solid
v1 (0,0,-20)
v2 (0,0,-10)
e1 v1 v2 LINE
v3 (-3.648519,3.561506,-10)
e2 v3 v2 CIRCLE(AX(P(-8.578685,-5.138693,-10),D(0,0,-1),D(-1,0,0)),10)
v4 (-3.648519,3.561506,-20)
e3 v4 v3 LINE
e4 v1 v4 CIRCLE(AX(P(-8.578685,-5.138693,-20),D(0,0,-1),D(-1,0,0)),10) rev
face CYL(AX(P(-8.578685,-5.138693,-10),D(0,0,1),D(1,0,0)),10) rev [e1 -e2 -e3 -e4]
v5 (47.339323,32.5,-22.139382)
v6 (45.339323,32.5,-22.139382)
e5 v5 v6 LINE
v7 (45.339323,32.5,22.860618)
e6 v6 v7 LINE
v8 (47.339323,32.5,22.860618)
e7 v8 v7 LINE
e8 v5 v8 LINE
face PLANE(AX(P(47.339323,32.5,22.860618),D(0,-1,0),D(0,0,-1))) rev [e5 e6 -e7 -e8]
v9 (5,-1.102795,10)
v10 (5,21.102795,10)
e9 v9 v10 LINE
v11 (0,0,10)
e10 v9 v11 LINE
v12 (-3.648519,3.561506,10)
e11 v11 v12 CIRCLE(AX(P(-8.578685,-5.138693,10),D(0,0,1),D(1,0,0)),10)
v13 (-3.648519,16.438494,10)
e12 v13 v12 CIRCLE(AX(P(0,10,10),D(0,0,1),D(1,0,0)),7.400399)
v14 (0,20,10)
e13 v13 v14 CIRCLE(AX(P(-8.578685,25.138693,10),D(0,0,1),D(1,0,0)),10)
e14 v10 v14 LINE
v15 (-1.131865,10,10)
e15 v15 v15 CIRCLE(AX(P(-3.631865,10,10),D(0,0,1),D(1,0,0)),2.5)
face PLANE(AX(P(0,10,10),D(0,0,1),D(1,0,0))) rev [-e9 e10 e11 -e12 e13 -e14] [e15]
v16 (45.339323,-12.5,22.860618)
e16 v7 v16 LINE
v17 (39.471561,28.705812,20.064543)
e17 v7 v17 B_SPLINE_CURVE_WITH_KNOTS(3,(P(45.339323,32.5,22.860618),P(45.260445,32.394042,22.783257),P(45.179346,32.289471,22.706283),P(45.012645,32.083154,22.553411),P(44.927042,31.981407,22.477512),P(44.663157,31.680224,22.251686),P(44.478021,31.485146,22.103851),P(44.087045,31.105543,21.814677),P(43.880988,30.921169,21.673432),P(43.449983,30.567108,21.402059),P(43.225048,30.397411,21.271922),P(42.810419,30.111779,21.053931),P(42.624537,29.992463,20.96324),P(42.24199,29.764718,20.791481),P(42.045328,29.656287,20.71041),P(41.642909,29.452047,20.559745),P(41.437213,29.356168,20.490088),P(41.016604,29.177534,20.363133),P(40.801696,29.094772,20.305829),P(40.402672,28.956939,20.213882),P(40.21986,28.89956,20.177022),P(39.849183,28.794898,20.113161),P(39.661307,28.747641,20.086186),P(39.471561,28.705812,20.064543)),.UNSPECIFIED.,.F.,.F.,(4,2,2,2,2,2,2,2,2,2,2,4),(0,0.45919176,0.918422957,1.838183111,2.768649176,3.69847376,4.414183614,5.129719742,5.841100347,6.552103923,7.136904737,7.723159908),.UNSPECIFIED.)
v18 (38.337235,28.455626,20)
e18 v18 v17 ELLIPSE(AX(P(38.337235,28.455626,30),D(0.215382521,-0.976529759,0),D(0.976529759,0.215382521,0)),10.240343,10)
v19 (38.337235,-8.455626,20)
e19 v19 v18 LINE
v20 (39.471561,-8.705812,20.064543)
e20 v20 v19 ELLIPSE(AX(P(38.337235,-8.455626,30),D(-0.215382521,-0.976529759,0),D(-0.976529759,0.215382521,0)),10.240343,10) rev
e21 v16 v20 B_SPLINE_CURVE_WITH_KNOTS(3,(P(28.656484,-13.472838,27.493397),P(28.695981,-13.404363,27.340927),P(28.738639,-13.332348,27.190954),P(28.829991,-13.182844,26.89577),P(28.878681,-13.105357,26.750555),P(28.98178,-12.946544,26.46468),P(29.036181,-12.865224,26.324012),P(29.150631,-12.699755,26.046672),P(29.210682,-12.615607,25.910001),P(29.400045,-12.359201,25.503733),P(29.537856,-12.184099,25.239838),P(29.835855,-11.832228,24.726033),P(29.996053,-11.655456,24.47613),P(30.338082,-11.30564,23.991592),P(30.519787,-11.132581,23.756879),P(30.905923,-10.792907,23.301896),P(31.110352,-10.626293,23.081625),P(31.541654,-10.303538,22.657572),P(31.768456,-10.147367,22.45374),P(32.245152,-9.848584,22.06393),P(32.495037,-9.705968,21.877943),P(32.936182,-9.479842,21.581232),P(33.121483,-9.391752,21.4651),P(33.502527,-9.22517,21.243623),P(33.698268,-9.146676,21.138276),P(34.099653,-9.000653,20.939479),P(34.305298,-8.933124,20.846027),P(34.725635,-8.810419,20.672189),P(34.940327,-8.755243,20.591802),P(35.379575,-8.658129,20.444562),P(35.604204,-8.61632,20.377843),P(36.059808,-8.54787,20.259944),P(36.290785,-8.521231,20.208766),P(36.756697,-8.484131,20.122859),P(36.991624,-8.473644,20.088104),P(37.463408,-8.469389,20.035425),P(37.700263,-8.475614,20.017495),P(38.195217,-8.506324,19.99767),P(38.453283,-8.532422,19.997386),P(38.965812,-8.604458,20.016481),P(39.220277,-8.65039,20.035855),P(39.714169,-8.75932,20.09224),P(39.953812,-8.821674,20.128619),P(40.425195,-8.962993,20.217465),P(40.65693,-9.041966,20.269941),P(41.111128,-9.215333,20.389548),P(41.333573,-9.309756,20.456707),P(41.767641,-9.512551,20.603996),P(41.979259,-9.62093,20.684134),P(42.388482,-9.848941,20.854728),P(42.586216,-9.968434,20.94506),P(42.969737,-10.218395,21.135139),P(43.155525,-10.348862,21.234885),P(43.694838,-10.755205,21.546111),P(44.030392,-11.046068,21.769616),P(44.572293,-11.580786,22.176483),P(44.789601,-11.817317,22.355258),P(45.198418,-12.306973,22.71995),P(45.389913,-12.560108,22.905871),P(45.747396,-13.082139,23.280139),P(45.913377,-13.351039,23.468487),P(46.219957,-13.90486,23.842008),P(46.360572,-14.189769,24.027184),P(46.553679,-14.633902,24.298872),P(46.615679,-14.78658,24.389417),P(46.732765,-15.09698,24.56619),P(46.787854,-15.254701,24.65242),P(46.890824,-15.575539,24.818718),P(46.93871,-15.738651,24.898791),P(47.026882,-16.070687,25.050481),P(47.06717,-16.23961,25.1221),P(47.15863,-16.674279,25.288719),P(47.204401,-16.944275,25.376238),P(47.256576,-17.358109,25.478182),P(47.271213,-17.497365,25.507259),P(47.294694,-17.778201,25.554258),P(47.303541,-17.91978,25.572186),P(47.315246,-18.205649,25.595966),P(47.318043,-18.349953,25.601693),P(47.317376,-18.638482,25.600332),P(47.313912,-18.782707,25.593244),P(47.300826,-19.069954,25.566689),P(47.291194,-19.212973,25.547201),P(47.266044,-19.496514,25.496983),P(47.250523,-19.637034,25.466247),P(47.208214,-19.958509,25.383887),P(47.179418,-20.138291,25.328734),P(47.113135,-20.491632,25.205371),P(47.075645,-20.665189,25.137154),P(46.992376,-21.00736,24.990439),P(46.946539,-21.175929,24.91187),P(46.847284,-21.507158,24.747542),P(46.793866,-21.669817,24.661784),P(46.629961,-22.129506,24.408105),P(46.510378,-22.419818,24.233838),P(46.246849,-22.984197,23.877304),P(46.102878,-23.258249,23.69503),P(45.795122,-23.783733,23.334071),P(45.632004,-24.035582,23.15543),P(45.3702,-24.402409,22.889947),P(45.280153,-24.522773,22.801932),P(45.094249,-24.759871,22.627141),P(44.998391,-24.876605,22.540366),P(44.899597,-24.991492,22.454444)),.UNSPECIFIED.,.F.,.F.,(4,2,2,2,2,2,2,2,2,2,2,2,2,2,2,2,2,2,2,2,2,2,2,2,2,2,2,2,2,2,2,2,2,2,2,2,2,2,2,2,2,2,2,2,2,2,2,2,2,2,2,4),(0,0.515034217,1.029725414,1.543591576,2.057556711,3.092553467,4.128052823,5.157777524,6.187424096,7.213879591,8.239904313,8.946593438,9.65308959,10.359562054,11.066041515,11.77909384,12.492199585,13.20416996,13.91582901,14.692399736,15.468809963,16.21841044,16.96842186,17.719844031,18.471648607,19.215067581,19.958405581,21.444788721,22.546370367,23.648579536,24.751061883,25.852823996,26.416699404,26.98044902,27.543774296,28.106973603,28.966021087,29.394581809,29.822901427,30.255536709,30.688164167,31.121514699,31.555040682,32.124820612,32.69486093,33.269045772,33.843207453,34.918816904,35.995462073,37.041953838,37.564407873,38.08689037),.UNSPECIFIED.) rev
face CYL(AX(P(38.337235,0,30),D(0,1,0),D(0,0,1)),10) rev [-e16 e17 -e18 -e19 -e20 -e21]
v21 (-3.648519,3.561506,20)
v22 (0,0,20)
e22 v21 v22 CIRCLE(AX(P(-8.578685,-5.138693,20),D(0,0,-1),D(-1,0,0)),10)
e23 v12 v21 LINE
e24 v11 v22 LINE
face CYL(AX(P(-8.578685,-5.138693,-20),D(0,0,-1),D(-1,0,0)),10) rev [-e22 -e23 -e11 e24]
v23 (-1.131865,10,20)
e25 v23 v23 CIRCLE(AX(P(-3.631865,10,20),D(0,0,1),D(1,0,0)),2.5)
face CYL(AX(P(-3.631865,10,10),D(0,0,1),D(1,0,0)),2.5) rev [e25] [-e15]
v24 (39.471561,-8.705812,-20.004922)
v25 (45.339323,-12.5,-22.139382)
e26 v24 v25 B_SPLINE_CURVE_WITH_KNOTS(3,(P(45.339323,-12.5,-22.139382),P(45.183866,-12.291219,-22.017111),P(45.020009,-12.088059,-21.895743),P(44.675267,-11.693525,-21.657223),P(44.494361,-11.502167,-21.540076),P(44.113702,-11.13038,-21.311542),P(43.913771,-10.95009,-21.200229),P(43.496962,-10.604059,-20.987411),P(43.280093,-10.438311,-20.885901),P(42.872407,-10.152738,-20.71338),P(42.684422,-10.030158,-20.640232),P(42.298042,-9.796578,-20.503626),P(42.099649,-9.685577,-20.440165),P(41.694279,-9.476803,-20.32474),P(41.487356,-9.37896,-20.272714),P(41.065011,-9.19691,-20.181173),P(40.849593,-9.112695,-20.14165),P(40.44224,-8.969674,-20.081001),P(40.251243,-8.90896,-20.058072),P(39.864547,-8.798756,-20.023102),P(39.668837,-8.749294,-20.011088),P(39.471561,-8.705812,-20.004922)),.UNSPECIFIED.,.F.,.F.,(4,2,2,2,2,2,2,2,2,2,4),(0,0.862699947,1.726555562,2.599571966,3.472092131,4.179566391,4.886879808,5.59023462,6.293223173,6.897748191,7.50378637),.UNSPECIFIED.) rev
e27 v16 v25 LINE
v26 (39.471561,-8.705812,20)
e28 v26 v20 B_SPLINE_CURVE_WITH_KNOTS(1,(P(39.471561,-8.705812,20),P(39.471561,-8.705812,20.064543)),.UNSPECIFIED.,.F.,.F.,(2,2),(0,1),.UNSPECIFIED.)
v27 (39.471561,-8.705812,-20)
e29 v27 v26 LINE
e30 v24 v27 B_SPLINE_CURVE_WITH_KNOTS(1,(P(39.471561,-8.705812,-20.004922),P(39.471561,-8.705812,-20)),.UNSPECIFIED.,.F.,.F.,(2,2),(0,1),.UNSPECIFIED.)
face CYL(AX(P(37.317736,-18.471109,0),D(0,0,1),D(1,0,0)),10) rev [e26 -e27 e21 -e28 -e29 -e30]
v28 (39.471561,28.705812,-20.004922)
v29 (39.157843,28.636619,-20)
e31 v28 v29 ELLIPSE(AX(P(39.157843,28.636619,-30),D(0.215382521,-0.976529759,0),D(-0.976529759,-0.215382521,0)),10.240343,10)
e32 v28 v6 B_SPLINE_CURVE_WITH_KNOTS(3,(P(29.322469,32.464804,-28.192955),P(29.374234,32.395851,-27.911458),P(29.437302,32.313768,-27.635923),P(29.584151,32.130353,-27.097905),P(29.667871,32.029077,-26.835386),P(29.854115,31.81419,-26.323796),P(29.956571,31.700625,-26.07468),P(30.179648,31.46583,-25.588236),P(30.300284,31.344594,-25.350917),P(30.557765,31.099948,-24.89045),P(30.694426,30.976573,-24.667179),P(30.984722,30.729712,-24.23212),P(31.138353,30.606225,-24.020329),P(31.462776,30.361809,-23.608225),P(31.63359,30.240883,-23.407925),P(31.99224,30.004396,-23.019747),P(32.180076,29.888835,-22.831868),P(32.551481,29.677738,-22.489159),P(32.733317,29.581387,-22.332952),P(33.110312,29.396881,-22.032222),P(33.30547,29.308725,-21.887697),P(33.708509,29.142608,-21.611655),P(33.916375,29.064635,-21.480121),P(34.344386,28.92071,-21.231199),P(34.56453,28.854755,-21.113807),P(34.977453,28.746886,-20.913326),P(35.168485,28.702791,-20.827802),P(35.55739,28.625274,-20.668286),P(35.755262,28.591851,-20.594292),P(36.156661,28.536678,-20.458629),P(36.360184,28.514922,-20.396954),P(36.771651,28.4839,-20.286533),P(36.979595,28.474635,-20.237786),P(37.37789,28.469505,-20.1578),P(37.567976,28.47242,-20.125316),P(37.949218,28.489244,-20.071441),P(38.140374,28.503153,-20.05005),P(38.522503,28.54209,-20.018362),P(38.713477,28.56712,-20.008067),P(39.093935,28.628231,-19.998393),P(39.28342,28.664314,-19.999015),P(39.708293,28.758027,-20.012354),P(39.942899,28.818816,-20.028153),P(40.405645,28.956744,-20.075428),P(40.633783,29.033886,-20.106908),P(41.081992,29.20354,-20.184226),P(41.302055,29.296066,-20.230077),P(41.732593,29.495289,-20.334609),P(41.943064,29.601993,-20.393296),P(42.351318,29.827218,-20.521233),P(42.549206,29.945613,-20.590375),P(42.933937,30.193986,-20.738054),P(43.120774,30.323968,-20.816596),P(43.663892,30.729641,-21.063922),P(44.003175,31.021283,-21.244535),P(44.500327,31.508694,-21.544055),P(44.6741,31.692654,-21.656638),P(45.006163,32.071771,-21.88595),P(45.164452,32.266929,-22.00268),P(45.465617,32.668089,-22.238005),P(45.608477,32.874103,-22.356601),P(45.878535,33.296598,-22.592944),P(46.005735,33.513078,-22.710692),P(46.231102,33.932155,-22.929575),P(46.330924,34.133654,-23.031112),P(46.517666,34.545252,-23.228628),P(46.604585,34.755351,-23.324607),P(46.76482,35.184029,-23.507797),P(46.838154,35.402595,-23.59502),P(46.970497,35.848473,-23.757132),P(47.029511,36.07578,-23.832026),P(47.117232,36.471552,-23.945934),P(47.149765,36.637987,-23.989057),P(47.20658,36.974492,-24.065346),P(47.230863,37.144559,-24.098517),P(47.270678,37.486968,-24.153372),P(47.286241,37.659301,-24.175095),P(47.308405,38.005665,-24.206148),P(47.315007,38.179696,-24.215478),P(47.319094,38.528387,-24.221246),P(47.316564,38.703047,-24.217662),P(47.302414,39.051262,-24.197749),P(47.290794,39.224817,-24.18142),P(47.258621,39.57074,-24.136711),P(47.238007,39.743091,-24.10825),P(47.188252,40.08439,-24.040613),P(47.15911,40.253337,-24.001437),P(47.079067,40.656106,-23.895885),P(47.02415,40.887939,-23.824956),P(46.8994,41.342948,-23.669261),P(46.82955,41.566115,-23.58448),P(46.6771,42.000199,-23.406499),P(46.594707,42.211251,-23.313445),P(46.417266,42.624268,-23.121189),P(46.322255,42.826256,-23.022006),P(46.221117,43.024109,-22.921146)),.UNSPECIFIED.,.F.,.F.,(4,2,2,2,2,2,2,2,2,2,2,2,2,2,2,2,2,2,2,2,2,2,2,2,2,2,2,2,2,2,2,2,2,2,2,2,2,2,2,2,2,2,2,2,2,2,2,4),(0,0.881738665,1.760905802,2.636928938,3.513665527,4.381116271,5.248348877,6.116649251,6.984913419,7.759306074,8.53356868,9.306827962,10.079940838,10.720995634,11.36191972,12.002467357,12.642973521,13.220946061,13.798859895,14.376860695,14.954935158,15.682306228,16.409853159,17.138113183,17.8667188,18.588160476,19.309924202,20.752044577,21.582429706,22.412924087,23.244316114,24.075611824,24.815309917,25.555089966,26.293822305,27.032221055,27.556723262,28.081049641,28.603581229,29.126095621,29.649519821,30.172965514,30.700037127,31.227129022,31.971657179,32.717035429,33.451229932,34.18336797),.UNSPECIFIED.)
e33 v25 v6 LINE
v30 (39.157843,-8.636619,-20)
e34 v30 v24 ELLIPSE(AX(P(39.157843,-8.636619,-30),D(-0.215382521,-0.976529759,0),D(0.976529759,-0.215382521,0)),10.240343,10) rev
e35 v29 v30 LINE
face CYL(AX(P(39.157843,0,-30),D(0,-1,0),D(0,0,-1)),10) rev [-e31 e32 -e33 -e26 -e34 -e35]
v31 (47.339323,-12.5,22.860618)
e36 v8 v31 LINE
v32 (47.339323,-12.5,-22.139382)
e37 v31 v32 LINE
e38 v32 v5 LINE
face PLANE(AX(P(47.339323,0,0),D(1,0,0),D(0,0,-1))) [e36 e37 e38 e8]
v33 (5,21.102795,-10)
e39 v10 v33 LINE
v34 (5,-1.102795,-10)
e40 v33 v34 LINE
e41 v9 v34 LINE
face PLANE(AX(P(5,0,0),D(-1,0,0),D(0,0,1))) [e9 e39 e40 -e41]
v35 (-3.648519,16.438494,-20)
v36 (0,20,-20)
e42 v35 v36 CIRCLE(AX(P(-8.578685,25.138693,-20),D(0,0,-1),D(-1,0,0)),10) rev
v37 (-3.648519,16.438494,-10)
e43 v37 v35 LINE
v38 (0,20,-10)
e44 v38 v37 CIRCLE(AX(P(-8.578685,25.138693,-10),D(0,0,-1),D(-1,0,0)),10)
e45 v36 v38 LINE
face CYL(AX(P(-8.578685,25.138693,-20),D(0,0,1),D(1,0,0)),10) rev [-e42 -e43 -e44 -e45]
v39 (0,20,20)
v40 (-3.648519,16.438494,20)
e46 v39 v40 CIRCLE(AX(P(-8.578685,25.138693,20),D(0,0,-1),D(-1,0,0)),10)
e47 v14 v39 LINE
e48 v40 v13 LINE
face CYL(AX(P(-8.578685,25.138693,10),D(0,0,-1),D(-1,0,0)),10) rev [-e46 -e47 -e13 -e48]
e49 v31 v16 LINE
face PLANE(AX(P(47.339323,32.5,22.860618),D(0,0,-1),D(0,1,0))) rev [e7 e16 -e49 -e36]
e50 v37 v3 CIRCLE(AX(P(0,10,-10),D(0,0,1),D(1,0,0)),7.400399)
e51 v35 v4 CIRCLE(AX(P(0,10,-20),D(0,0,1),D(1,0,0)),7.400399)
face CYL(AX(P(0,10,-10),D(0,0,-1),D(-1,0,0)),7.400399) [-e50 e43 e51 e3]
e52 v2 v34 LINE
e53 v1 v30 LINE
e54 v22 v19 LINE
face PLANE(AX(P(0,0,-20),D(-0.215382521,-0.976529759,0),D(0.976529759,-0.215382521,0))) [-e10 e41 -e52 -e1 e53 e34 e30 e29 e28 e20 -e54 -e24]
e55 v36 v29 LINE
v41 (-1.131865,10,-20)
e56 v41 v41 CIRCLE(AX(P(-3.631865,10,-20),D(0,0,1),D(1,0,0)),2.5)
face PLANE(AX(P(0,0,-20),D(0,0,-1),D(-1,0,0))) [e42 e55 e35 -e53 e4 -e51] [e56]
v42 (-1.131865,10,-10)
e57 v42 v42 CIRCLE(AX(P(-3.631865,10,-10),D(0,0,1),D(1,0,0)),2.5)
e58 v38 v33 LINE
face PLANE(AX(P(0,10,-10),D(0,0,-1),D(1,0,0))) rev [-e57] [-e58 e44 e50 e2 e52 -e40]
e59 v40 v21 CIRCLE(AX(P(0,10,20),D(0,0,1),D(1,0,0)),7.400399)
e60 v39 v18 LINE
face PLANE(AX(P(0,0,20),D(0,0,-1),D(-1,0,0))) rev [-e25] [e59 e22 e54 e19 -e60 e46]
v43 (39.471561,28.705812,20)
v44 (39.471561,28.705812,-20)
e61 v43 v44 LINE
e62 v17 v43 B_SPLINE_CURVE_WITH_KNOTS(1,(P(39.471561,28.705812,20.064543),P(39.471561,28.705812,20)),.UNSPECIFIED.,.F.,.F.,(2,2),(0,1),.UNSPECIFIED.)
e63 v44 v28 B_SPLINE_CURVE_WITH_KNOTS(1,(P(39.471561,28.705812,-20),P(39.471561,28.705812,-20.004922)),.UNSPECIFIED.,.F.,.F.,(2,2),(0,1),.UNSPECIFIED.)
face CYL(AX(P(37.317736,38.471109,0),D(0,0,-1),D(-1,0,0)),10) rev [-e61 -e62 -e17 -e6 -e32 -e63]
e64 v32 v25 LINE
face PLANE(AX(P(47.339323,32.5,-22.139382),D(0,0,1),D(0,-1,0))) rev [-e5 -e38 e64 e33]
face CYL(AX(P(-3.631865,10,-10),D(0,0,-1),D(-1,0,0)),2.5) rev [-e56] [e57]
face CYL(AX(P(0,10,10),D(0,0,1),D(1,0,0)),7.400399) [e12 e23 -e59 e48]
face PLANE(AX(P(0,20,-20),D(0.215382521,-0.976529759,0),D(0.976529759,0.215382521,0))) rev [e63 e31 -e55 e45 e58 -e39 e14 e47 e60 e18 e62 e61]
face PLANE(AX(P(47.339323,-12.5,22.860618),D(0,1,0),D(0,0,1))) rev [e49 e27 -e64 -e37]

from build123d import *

# Parameters (mm, degrees)
BOSS_EXTRUDE1_DEPTH      = 20
BOSS_EXTRUDE1_DEPTH_BACK = 20
SKETCH2_W                = 45
SKETCH2_H                = 45
BOSS_EXTRUDE2_DEPTH      = 2
SKETCH3_R                = 2.5
BOSS_EXTRUDE3_DEPTH      = 10
FILLET1_R                = 10
FILLET2_R                = 10
FILLET1_OF_MIRROR1_R     = 10
CUT_EXTRUDE1_DEPTH       = 5


with BuildPart() as part:
    # Sketch1 → Boss-Extrude1 (new, two sides: drawn at the far end of the back side and taken through both)
    with BuildSketch(Plane.XY.offset(-BOSS_EXTRUDE1_DEPTH_BACK)):
        Polygon((0, 0), (45.339322565, -10), (45.339322565, 30), (0, 20), align=None)
    extrude(amount=BOSS_EXTRUDE1_DEPTH + BOSS_EXTRUDE1_DEPTH_BACK)

    # Sketch2 → Boss-Extrude2 (add)
    with BuildSketch(Plane(origin=(45.339322565, 0, 0), x_dir=(0, 0, -1), z_dir=(1, 0, 0))):
        with Locations((-0.360618032, 10)):
            Rectangle(SKETCH2_W, SKETCH2_H)
    extrude(amount=BOSS_EXTRUDE2_DEPTH)

    # Sketch3 → Boss-Extrude3 (add)
    with BuildSketch(Plane.XY.offset(20)):
        with BuildLine():
            Line((0, 17.400398526), (0, 2.599601474))
            ThreePointArc((0, 2.599601474), (-7.400398526, 10), (0, 17.400398526))
        make_face()
        with Locations((-3.63186502, 10)):
            Circle(SKETCH3_R, mode=Mode.SUBTRACT)
    boss_extrude3 = extrude(amount=-BOSS_EXTRUDE3_DEPTH)

    # Fillet1
    # the kernel refuses this fillet: 10 mm, written as the material it adds along each edge
    with BuildSketch(Plane(origin=(0, 17.400398526, 20), x_dir=(0, 1, 0), z_dir=(0, 0, -1))) as fillet1_piece_1:
        with BuildLine():
            CenterArc((7.738294917, -8.578684614), FILLET1_R, 120.92191029, 29.539044855)
            Line((-0.961904346, -3.64851902), (-1.135908331, -3.549915708))
            ThreePointArc((-1.135908331, -3.549915708), (-0.437907417, -1.835607933), (-0.2, 0))
            Line((-0.2, 0), (0, 0.2))
            ThreePointArc((0, 0.2), (1.299800737, 0.2), (2.496827605, 0.171573692))
            Line((2.496827605, 0.171573692), (2.599601474, 0))
        make_face()
    extrude(amount=10)
    with BuildSketch(Plane(origin=(0, 2.599601474, 20), x_dir=(0, -1, 0), z_dir=(0, 0, -1))) as fillet1_piece_2:
        with BuildLine():
            CenterArc((7.738294917, 8.578684614), FILLET1_R, 209.539044855, 29.539044855)
            Line((-0.961904346, 3.64851902), (-1.135908331, 3.549915708))
            ThreePointArc((-1.135908331, 3.549915708), (-0.437907417, 1.835607933), (-0.2, 0))
            Line((-0.2, 0), (0, -0.2))
            ThreePointArc((0, -0.2), (1.299800737, -0.2), (2.496827605, -0.171573692))
            Line((2.496827605, -0.171573692), (2.599601474, 0))
        make_face()
    extrude(amount=10)

    # Fillet2
    # the kernel refuses this fillet: 10 mm, written as the material it adds along each edge
    with BuildSketch(Plane(origin=(45.339322565, -25.45369781, -20), x_dir=(0, 0, -1), z_dir=(0, 1, 0))) as fillet2_piece_1_section:
        with BuildLine():
            CenterArc((10, 6.181479124), FILLET2_R, 180, 38.181011009)
            Line((0, 6.181479124), (-0.2, 6.181479124))
            Line((-0.2, 6.181479124), (-0.2, 0))
            Line((-0.2, 0), (0, -0.2))
            ThreePointArc((0, -0.2), (1.069690984, -0.2), (1.982169608, -0.123629582))
            Line((1.982169608, -0.123629582), (2.139381968, 0))
        make_face()
    fillet2_piece_1 = extrude(amount=70.907395619, mode=Mode.PRIVATE)
    fillet2_piece_1 = split(fillet2_piece_1, bisect_by=Plane(origin=(39.504780755, 28.713138732, -20.498392339), z_dir=(0.21538252084274712, -0.9765297587454381, 0)), keep=Keep.TOP, mode=Mode.PRIVATE)
    fillet2_piece_1 = split(fillet2_piece_1, bisect_by=Plane(origin=(39.504780755, -8.713138732, -20.498392339), z_dir=(0.21538252084274712, 0.9765297587454381, 0)), keep=Keep.TOP, mode=Mode.PRIVATE)
    add(fillet2_piece_1)
    with BuildSketch(Plane(origin=(45.339322565, -27.505217992, 20), x_dir=(0, 0, 1), z_dir=(0, 1, 0))) as fillet2_piece_2_section:
        with BuildLine():
            CenterArc((10, -7.002087197), FILLET2_R, 135.556247991, 44.443752009)
            Line((0, -7.002087197), (-0.2, -7.002087197))
            Line((-0.2, -7.002087197), (-0.2, 0))
            Line((-0.2, 0), (0, 0.2))
            ThreePointArc((0, 0.2), (1.430309016, 0.2), (2.717830392, 0.140041744))
            Line((2.717830392, 0.140041744), (2.860618032, 0))
        make_face()
    fillet2_piece_2 = extrude(amount=75.010435984, mode=Mode.PRIVATE)
    fillet2_piece_2 = split(fillet2_piece_2, bisect_by=Plane(origin=(39.36542439, 28.682402419, 20.709590356), z_dir=(0.21538252084274712, -0.9765297587454381, 0)), keep=Keep.TOP, mode=Mode.PRIVATE)
    fillet2_piece_2 = split(fillet2_piece_2, bisect_by=Plane(origin=(39.36542439, -8.682402419, 20.709590356), z_dir=(0.21538252084274712, 0.9765297587454381, 0)), keep=Keep.TOP, mode=Mode.PRIVATE)
    add(fillet2_piece_2)
    with BuildSketch(Plane(origin=(45.339322565, -10, -20), x_dir=(0, -1, 0), z_dir=(0, 0, 1))) as fillet2_piece_3:
        with BuildLine():
            CenterArc((8.471109431, -8.021586636), FILLET2_R, 126.663263197, 40.898766881)
            Line((-1.294188156, -5.867761428), (-1.489494108, -5.824684924))
            Line((-1.489494108, -5.824684924), (-0.195305952, 0.043076504))
            Line((-0.195305952, 0.043076504), (0, 0.2))
            ThreePointArc((0, 0.2), (1.25, 0.2), (2.380577811, 0.160431733))
            Line((2.380577811, 0.160431733), (2.5, 0))
        make_face()
    extrude(amount=40)
    with BuildSketch(Plane(origin=(45.339322565, 30, -20), x_dir=(-0.9765297587454381, -0.2153825208427468, 0), z_dir=(0, 0, 1))) as fillet2_piece_4:
        with BuildLine():
            CenterArc((6.008789159, -10), FILLET2_R, 90, 40.898766881)
            Line((-0.538456302, -2.441324397), (-0.669401211, -2.290150885))
            ThreePointArc((-0.669401211, -2.290150885), (-0.464534103, -1.177585694), (-0.195305952, 0.043076504))
            Line((-0.195305952, 0.043076504), (0, 0.2))
            Line((0, 0.2), (6.008789159, 0.2))
            Line((6.008789159, 0.2), (6.008789159, 0))
        make_face()
    extrude(amount=40)
    with BuildSketch(Plane(origin=(45.339322565, -10, -35.021972897), x_dir=(0, -1, 0), z_dir=(0, 0, 1))) as fillet2_piece_5a_section:
        with BuildLine():
            CenterArc((8.471109431, -8.021586636), FILLET2_R, 126.663263197, 40.898766881)
            Line((-1.294188156, -5.867761428), (-1.489494108, -5.824684924))
            Line((-1.489494108, -5.824684924), (-0.195305952, 0.043076504))
            Line((-0.195305952, 0.043076504), (0, 0.2))
            ThreePointArc((0, 0.2), (1.25, 0.2), (2.380577811, 0.160431733))
            Line((2.380577811, 0.160431733), (2.5, 0))
        make_face()
    fillet2_piece_5a = extrude(amount=55.021972897, mode=Mode.PRIVATE)
    fillet2_piece_5a = split(fillet2_piece_5a, bisect_by=Plane(origin=(43.769128199, -10.239106688, -22.139381968), z_dir=(0, 0, 1)), keep=Keep.TOP, mode=Mode.PRIVATE)
    fillet2_piece_5a = split(fillet2_piece_5a, bisect_by=Plane(origin=(43.769128199, -10.239106688, -20), z_dir=(0, 0, -1)), keep=Keep.TOP, mode=Mode.PRIVATE)
    with BuildSketch(Plane(origin=(45.339322565, -25.45369781, -20), x_dir=(0, 0, -1), z_dir=(0, 1, 0))) as fillet2_piece_5b_section:
        with BuildLine():
            CenterArc((10, 6.181479124), FILLET2_R, 180, 38.181011009)
            Line((0, 6.181479124), (-0.2, 6.181479124))
            Line((-0.2, 6.181479124), (-0.2, 0))
            Line((-0.2, 0), (0, -0.2))
            ThreePointArc((0, -0.2), (1.069690984, -0.2), (1.982169608, -0.123629582))
            Line((1.982169608, -0.123629582), (2.139381968, 0))
        make_face()
    fillet2_piece_5b = extrude(amount=70.907395619, mode=Mode.PRIVATE)
    fillet2_piece_5b = split(fillet2_piece_5b, bisect_by=Plane(origin=(43.426536719, -12.5, -20.45631317), z_dir=(0, 1, 0)), keep=Keep.TOP, mode=Mode.PRIVATE)
    fillet2_piece_5b = split(fillet2_piece_5b, bisect_by=Plane(origin=(43.733812734, -9.645890203, -20.45631317), z_dir=(-0.21538252084274712, -0.9765297587454381, 0)), keep=Keep.TOP, mode=Mode.PRIVATE)
    fillet2_piece_5 = fillet2_piece_5a & fillet2_piece_5b
    add(fillet2_piece_5)
    with BuildSketch(Plane(origin=(45.339322565, 30, -35.021972897), x_dir=(-0.9765297587454381, -0.2153825208427468, 0), z_dir=(0, 0, 1))) as fillet2_piece_6a_section:
        with BuildLine():
            CenterArc((6.008789159, -10), FILLET2_R, 90, 40.898766881)
            Line((-0.538456302, -2.441324397), (-0.669401211, -2.290150885))
            ThreePointArc((-0.669401211, -2.290150885), (-0.464534103, -1.177585694), (-0.195305952, 0.043076504))
            Line((-0.195305952, 0.043076504), (0, 0.2))
            Line((0, 0.2), (6.008789159, 0.2))
            Line((6.008789159, 0.2), (6.008789159, 0))
        make_face()
    fillet2_piece_6a = extrude(amount=55.021972897, mode=Mode.PRIVATE)
    fillet2_piece_6a = split(fillet2_piece_6a, bisect_by=Plane(origin=(43.769128199, 30.239106688, -20), z_dir=(0, 0, -1)), keep=Keep.TOP, mode=Mode.PRIVATE)
    fillet2_piece_6a = split(fillet2_piece_6a, bisect_by=Plane(origin=(43.769128199, 30.239106688, -22.139381968), z_dir=(0, 0, 1)), keep=Keep.TOP, mode=Mode.PRIVATE)
    with BuildSketch(Plane(origin=(45.339322565, -25.45369781, -20), x_dir=(0, 0, -1), z_dir=(0, 1, 0))) as fillet2_piece_6b_section:
        with BuildLine():
            CenterArc((10, 6.181479124), FILLET2_R, 180, 38.181011009)
            Line((0, 6.181479124), (-0.2, 6.181479124))
            Line((-0.2, 6.181479124), (-0.2, 0))
            Line((-0.2, 0), (0, -0.2))
            ThreePointArc((0, -0.2), (1.069690984, -0.2), (1.982169608, -0.123629582))
            Line((1.982169608, -0.123629582), (2.139381968, 0))
        make_face()
    fillet2_piece_6b = extrude(amount=70.907395619, mode=Mode.PRIVATE)
    fillet2_piece_6b = split(fillet2_piece_6b, bisect_by=Plane(origin=(43.733812734, 29.645890203, -20.45631317), z_dir=(-0.21538252084274712, 0.9765297587454381, 0)), keep=Keep.TOP, mode=Mode.PRIVATE)
    fillet2_piece_6b = split(fillet2_piece_6b, bisect_by=Plane(origin=(43.426536719, 32.5, -20.45631317), z_dir=(0, -1, 0)), keep=Keep.TOP, mode=Mode.PRIVATE)
    fillet2_piece_6 = fillet2_piece_6a & fillet2_piece_6b
    add(fillet2_piece_6)
    with BuildSketch(Plane(origin=(45.339322565, -10, -20), x_dir=(0, -1, 0), z_dir=(0, 0, 1))) as fillet2_piece_7a_section:
        with BuildLine():
            CenterArc((8.471109431, -8.021586636), FILLET2_R, 126.663263197, 40.898766881)
            Line((-1.294188156, -5.867761428), (-1.489494108, -5.824684924))
            Line((-1.489494108, -5.824684924), (-0.195305952, 0.043076504))
            Line((-0.195305952, 0.043076504), (0, 0.2))
            ThreePointArc((0, 0.2), (1.25, 0.2), (2.380577811, 0.160431733))
            Line((2.380577811, 0.160431733), (2.5, 0))
        make_face()
    fillet2_piece_7a = extrude(amount=55.021972897, mode=Mode.PRIVATE)
    fillet2_piece_7a = split(fillet2_piece_7a, bisect_by=Plane(origin=(43.769128199, -10.239106688, 22.860618032), z_dir=(0, 0, -1)), keep=Keep.TOP, mode=Mode.PRIVATE)
    fillet2_piece_7a = split(fillet2_piece_7a, bisect_by=Plane(origin=(43.769128199, -10.239106688, 20), z_dir=(0, 0, 1)), keep=Keep.TOP, mode=Mode.PRIVATE)
    with BuildSketch(Plane(origin=(45.339322565, -27.505217992, 20), x_dir=(0, 0, 1), z_dir=(0, 1, 0))) as fillet2_piece_7b_section:
        with BuildLine():
            CenterArc((10, -7.002087197), FILLET2_R, 135.556247991, 44.443752009)
            Line((0, -7.002087197), (-0.2, -7.002087197))
            Line((-0.2, -7.002087197), (-0.2, 0))
            Line((-0.2, 0), (0, 0.2))
            ThreePointArc((0, 0.2), (1.430309016, 0.2), (2.717830392, 0.140041744))
            Line((2.717830392, 0.140041744), (2.860618032, 0))
        make_face()
    fillet2_piece_7b = extrude(amount=75.010435984, mode=Mode.PRIVATE)
    fillet2_piece_7b = split(fillet2_piece_7b, bisect_by=Plane(origin=(43.242503202, -12.5, 20.649437077), z_dir=(0, 1, 0)), keep=Keep.TOP, mode=Mode.PRIVATE)
    fillet2_piece_7b = split(fillet2_piece_7b, bisect_by=Plane(origin=(43.554047841, -9.606241421, 20.649437077), z_dir=(-0.21538252084274712, -0.9765297587454381, 0)), keep=Keep.TOP, mode=Mode.PRIVATE)
    fillet2_piece_7 = fillet2_piece_7a & fillet2_piece_7b
    add(fillet2_piece_7)
    with BuildSketch(Plane(origin=(45.339322565, 30, -20), x_dir=(-0.9765297587454381, -0.2153825208427468, 0), z_dir=(0, 0, 1))) as fillet2_piece_8a_section:
        with BuildLine():
            CenterArc((6.008789159, -10), FILLET2_R, 90, 40.898766881)
            Line((-0.538456302, -2.441324397), (-0.669401211, -2.290150885))
            ThreePointArc((-0.669401211, -2.290150885), (-0.464534103, -1.177585694), (-0.195305952, 0.043076504))
            Line((-0.195305952, 0.043076504), (0, 0.2))
            Line((0, 0.2), (6.008789159, 0.2))
            Line((6.008789159, 0.2), (6.008789159, 0))
        make_face()
    fillet2_piece_8a = extrude(amount=55.021972897, mode=Mode.PRIVATE)
    fillet2_piece_8a = split(fillet2_piece_8a, bisect_by=Plane(origin=(43.769128199, 30.239106688, 20), z_dir=(0, 0, 1)), keep=Keep.TOP, mode=Mode.PRIVATE)
    fillet2_piece_8a = split(fillet2_piece_8a, bisect_by=Plane(origin=(43.769128199, 30.239106688, 22.860618032), z_dir=(0, 0, -1)), keep=Keep.TOP, mode=Mode.PRIVATE)
    with BuildSketch(Plane(origin=(45.339322565, -27.505217992, 20), x_dir=(0, 0, 1), z_dir=(0, 1, 0))) as fillet2_piece_8b_section:
        with BuildLine():
            CenterArc((10, -7.002087197), FILLET2_R, 135.556247991, 44.443752009)
            Line((0, -7.002087197), (-0.2, -7.002087197))
            Line((-0.2, -7.002087197), (-0.2, 0))
            Line((-0.2, 0), (0, 0.2))
            ThreePointArc((0, 0.2), (1.430309016, 0.2), (2.717830392, 0.140041744))
            Line((2.717830392, 0.140041744), (2.860618032, 0))
        make_face()
    fillet2_piece_8b = extrude(amount=75.010435984, mode=Mode.PRIVATE)
    fillet2_piece_8b = split(fillet2_piece_8b, bisect_by=Plane(origin=(43.554047841, 29.606241421, 20.649437077), z_dir=(-0.21538252084274712, 0.9765297587454381, 0)), keep=Keep.TOP, mode=Mode.PRIVATE)
    fillet2_piece_8b = split(fillet2_piece_8b, bisect_by=Plane(origin=(43.242503202, 32.5, 20.649437077), z_dir=(0, -1, 0)), keep=Keep.TOP, mode=Mode.PRIVATE)
    fillet2_piece_8 = fillet2_piece_8a & fillet2_piece_8b
    add(fillet2_piece_8)

    # Mirror1: Boss-Extrude3 across plane
    add(boss_extrude3.mirror(Plane.XY))

    # Fillet1 of Mirror1
    # the kernel refuses this fillet: 10 mm, written as the material it adds along each edge
    with BuildSketch(Plane(origin=(0, 17.400398526, -20), x_dir=(0, 1, 0), z_dir=(0, 0, 1))) as fillet1_of_mirror1_piece_1:
        with BuildLine():
            CenterArc((7.738294917, 8.578684614), FILLET1_OF_MIRROR1_R, 209.539044855, 29.539044855)
            Line((-0.961904346, 3.64851902), (-1.135908331, 3.549915708))
            ThreePointArc((-1.135908331, 3.549915708), (-0.437907417, 1.835607933), (-0.2, 0))
            Line((-0.2, 0), (0, -0.2))
            ThreePointArc((0, -0.2), (1.299800737, -0.2), (2.496827605, -0.171573692))
            Line((2.496827605, -0.171573692), (2.599601474, 0))
        make_face()
    extrude(amount=10)
    with BuildSketch(Plane(origin=(0, 2.599601474, -20), x_dir=(0, -1, 0), z_dir=(0, 0, 1))) as fillet1_of_mirror1_piece_2:
        with BuildLine():
            CenterArc((7.738294917, -8.578684614), FILLET1_OF_MIRROR1_R, 120.92191029, 29.539044855)
            Line((-0.961904346, -3.64851902), (-1.135908331, -3.549915708))
            ThreePointArc((-1.135908331, -3.549915708), (-0.437907417, -1.835607933), (-0.2, 0))
            Line((-0.2, 0), (0, 0.2))
            ThreePointArc((0, 0.2), (1.299800737, 0.2), (2.496827605, 0.171573692))
            Line((2.496827605, 0.171573692), (2.599601474, 0))
        make_face()
    extrude(amount=10)

    # Sketch4 → Cut-Extrude1 (cut)
    with BuildSketch(Plane.ZY):
        Polygon((-10, 20), (-10, 23.785509991), (10, 23.785509991), (10, 20), (10, 0), (10, -3.785509991), (-10, -3.785509991), (-10, 0), align=None)
    extrude(amount=-CUT_EXTRUDE1_DEPTH, mode=Mode.SUBTRACT)


solid = part.part
